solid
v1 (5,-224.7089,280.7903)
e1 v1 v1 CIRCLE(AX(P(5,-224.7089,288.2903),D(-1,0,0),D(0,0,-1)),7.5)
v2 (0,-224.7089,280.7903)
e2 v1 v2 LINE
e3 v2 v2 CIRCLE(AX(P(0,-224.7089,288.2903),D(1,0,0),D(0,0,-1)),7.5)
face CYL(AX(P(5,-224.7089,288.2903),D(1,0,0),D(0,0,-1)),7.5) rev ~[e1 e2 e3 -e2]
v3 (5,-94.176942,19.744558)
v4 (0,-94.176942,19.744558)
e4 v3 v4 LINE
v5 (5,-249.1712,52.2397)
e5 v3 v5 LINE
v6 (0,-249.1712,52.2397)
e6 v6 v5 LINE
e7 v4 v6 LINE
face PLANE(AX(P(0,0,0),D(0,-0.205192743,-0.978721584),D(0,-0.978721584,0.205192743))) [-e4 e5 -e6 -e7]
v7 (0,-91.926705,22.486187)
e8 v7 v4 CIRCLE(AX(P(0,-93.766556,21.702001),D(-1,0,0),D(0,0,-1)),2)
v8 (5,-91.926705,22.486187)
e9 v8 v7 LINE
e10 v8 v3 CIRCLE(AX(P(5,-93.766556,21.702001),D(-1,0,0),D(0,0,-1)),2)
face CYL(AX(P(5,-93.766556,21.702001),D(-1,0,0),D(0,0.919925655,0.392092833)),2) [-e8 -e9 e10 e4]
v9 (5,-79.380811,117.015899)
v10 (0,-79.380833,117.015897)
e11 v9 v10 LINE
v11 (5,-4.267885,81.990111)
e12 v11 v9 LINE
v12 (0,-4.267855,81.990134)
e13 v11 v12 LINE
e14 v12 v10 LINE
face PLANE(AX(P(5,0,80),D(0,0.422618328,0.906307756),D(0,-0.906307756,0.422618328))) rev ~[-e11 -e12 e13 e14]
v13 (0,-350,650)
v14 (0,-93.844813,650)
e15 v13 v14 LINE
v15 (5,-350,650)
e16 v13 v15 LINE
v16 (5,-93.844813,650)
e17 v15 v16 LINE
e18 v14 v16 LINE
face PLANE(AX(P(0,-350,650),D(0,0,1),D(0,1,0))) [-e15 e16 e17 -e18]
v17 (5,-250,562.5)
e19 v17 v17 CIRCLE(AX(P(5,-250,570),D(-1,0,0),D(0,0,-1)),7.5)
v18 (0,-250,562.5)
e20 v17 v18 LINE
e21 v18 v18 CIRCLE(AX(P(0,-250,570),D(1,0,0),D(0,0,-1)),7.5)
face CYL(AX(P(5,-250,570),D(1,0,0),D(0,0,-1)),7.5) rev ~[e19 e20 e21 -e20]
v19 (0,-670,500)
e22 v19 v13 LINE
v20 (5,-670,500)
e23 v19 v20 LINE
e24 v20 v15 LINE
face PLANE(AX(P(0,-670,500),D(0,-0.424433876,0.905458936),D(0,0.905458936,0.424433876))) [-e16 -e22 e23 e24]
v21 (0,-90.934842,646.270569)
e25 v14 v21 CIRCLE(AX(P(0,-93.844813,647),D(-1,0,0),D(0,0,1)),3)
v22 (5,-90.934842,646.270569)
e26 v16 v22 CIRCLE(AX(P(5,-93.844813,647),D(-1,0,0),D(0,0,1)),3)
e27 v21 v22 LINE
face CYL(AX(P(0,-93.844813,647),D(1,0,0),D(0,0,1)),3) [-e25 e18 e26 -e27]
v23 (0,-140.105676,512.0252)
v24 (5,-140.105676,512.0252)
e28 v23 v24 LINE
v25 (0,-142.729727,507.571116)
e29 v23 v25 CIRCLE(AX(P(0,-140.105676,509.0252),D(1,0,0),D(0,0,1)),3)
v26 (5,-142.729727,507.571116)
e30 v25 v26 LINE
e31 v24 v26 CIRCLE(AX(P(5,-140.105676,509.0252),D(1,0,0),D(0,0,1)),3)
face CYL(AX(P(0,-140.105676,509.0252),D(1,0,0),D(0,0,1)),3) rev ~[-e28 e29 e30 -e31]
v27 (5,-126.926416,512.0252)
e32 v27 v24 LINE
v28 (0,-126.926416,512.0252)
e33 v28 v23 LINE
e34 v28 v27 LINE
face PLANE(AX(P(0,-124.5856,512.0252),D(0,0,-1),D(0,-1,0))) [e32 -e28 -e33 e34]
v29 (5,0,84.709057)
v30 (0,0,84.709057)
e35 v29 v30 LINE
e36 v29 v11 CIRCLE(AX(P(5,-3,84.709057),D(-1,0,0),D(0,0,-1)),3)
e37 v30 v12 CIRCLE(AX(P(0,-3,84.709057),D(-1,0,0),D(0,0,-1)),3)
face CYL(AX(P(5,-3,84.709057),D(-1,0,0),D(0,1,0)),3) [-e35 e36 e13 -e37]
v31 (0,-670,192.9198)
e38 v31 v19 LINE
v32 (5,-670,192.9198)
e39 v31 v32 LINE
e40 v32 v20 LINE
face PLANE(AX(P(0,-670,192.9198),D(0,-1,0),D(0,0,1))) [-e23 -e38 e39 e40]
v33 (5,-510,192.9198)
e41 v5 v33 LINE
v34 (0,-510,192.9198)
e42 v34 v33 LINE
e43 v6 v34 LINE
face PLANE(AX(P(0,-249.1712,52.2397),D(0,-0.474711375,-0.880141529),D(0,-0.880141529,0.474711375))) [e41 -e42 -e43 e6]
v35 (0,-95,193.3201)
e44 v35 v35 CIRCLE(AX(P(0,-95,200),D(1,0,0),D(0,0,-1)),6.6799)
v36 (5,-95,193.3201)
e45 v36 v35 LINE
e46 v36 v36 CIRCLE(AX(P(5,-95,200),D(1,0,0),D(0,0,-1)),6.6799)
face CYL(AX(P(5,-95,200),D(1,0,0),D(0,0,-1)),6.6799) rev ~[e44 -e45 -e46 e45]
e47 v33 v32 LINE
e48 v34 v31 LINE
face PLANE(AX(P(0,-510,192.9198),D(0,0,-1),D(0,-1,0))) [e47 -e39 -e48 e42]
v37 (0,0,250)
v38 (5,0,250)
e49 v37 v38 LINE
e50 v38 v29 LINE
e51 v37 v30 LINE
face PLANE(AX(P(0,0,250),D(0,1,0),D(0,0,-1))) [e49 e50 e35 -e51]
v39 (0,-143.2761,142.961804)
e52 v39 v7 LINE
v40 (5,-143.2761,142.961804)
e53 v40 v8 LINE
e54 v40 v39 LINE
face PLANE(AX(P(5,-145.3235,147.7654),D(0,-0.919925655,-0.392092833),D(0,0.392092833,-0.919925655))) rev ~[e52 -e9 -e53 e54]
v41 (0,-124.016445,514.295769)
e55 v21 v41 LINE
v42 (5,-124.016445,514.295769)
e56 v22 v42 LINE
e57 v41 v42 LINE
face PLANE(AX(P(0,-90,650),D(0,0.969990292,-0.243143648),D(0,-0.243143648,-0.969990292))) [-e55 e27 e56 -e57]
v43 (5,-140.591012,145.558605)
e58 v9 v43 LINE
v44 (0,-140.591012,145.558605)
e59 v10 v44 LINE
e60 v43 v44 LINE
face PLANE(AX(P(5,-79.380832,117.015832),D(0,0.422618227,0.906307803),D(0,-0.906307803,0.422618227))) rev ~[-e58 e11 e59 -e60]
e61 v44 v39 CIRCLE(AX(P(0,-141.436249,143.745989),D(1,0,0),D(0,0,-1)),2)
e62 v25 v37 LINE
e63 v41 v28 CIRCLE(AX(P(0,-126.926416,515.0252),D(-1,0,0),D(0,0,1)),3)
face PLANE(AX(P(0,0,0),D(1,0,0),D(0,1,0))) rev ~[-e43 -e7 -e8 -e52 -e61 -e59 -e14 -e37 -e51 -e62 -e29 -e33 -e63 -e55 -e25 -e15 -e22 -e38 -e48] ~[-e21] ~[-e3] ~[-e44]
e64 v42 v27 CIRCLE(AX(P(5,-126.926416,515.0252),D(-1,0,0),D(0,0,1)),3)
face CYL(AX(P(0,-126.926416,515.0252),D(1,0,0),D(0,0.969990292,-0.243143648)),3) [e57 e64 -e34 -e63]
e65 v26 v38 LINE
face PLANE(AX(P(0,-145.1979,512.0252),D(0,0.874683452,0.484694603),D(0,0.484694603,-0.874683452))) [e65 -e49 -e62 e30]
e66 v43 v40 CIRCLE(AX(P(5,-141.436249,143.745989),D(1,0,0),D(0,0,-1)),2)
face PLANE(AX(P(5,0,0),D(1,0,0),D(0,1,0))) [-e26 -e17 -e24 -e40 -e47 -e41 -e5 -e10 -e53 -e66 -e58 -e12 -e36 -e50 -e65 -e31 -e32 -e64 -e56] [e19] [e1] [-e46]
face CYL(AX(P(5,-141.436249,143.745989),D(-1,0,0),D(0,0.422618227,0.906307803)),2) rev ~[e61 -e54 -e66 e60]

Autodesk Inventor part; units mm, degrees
ref_plane "YZ Plane" through (0, 0, 0) normal (1, 0, 0) x (0, 1, 0)
ref_plane "XZ Plane" through (0, 0, 0) normal (0, 1, 0) x (-1, 0, 0)
ref_plane "XY Plane" through (0, 0, 0) normal (0, 0, 1) x (1, 0, 0)
sketch "スケッチ1" plane through (0, 0, 0) normal (1, 0, 0) x (0, 1, 0)
  line L0 (-670, 192.9198) -> (-670, 500)
  line L1 (-670, 500) -> (-350, 650)
  line L2 (-350, 650) -> (-90, 650)
  line L3 (0, 250) -> (0, 0)
  line L4 (-124.5856, 512.0252) -> (-145.1979, 512.0252)
  line L5 (-145.1979, 512.0252) -> (0, 250)
  line L6 (-90, 650) -> (-124.5856, 512.0252)
  line L7 (-249.1712, 52.2397) -> (-510, 192.9198)
  line L8 (-510, 192.9198) -> (-670, 192.9198)
  line L9 (0, 0) -> (-249.1712, 52.2397)
  dimension "d2" = 150
  dimension "d3" = 320
  dimension "d4" = 250
  dimension "d5" = 670
  dimension "d79" = 260
extrude "押し出し1" add sketch "スケッチ1" along normal blind 5
sketch "スケッチ8" plane through (5, 0, 0) normal (1, 0, 0) x (0, 0, -1)
  circle A0 centre (-570, -250) radius 7.5
  circle A1 centre (-288.2903, -224.7089) radius 7.5
  line L0 (0, 0) -> (-250, 0) projected
  line L1 (-570, -250) -> (-290.3837, -264.6541)
  line L2 (-290.3837, -264.6541) -> (-288.2903, -224.7089)
  line L3 (0, -804) -> (0, 134) projected
  dimension "d65" = 15
  dimension "d66" = 15
  dimension "d77" = 250
  dimension "d88" = 40
  dimension "d89" = 280
  dimension "d90" = 3
  dimension "d91" = 570
extrude "押し出し8" cut sketch "スケッチ8" against normal through all
sketch "スケッチ12" plane through (5, 0, 0) normal (1, 0, 0) x (0, 0, -1)
  circle A0 centre (-200, -95) radius 6.6799
  point P0 (0, 0)
  dimension "d84" = 200
  dimension "d85" = 95
extrude "押し出し11" cut sketch "スケッチ12" against normal through all
sketch "スケッチ13" plane through (5, 0, 0) normal (1, 0, 0) x (0, 0, -1)
  line L0 (0, -804) -> (0, 134) projected
  line L1 (130, 0) -> (-780, 0) projected
  line L2 (-80, 0) -> (-121.7476, -89.528)
  line L3 (-121.7476, -89.528) -> (-1.0516, -5.0157)
  line L4 (-52.2397, -249.1712) -> (0, 0) projected
  dimension "d95" = 80
  dimension "d96" = 115
  dimension "d97" = 30
extrude "押し出し12" cut sketch "スケッチ13" against normal through all
fillet "フィレット2" radius 3 6 edges at (2.5, -89.528, 121.7476) (2.5, -5.0157, 1.0516) (2.5, 0, 80) (2.5, -145.1979, 512.0252) (2.5, -124.5856, 512.0252) (2.5, -90, 650)
sketch "スケッチ14" plane through (5, 0, 0) normal (1, 0, 0) x (0, 0, -1)
  line L0 (-117.0159, -79.3808) -> (-81.9901, -4.2679) projected
  line L1 (-52.2397, -249.1712) -> (-2.608, -12.4393) projected
  line L2 (-7.2648, -9.3663) -> (-112.5762, -83.1061) projected
  line L3 (-81.9901, -4.2679) -> (-147.7654, -145.3235)
  line L4 (-147.7654, -145.3235) -> (-18.9575, -90.4227)
  line L5 (-52.2397, -249.1712) -> (-2.608, -12.4393) projected
  line L6 (-18.9575, -90.4227) -> (-2.608, -12.4393)
  line L7 (-2.608, -12.4393) -> (0, 0)
  line L8 (0, 0) -> (-81.9901, -4.2679)
extrude "押し出し13" cut sketch "スケッチ14" against normal through all
fillet "フィレット3" radius 2 2 edges at (2.5, -145.3235, 147.7654) (2.5, -90.4227, 18.9575)
properties part number "end_plate" material "木材 (オーク)"
